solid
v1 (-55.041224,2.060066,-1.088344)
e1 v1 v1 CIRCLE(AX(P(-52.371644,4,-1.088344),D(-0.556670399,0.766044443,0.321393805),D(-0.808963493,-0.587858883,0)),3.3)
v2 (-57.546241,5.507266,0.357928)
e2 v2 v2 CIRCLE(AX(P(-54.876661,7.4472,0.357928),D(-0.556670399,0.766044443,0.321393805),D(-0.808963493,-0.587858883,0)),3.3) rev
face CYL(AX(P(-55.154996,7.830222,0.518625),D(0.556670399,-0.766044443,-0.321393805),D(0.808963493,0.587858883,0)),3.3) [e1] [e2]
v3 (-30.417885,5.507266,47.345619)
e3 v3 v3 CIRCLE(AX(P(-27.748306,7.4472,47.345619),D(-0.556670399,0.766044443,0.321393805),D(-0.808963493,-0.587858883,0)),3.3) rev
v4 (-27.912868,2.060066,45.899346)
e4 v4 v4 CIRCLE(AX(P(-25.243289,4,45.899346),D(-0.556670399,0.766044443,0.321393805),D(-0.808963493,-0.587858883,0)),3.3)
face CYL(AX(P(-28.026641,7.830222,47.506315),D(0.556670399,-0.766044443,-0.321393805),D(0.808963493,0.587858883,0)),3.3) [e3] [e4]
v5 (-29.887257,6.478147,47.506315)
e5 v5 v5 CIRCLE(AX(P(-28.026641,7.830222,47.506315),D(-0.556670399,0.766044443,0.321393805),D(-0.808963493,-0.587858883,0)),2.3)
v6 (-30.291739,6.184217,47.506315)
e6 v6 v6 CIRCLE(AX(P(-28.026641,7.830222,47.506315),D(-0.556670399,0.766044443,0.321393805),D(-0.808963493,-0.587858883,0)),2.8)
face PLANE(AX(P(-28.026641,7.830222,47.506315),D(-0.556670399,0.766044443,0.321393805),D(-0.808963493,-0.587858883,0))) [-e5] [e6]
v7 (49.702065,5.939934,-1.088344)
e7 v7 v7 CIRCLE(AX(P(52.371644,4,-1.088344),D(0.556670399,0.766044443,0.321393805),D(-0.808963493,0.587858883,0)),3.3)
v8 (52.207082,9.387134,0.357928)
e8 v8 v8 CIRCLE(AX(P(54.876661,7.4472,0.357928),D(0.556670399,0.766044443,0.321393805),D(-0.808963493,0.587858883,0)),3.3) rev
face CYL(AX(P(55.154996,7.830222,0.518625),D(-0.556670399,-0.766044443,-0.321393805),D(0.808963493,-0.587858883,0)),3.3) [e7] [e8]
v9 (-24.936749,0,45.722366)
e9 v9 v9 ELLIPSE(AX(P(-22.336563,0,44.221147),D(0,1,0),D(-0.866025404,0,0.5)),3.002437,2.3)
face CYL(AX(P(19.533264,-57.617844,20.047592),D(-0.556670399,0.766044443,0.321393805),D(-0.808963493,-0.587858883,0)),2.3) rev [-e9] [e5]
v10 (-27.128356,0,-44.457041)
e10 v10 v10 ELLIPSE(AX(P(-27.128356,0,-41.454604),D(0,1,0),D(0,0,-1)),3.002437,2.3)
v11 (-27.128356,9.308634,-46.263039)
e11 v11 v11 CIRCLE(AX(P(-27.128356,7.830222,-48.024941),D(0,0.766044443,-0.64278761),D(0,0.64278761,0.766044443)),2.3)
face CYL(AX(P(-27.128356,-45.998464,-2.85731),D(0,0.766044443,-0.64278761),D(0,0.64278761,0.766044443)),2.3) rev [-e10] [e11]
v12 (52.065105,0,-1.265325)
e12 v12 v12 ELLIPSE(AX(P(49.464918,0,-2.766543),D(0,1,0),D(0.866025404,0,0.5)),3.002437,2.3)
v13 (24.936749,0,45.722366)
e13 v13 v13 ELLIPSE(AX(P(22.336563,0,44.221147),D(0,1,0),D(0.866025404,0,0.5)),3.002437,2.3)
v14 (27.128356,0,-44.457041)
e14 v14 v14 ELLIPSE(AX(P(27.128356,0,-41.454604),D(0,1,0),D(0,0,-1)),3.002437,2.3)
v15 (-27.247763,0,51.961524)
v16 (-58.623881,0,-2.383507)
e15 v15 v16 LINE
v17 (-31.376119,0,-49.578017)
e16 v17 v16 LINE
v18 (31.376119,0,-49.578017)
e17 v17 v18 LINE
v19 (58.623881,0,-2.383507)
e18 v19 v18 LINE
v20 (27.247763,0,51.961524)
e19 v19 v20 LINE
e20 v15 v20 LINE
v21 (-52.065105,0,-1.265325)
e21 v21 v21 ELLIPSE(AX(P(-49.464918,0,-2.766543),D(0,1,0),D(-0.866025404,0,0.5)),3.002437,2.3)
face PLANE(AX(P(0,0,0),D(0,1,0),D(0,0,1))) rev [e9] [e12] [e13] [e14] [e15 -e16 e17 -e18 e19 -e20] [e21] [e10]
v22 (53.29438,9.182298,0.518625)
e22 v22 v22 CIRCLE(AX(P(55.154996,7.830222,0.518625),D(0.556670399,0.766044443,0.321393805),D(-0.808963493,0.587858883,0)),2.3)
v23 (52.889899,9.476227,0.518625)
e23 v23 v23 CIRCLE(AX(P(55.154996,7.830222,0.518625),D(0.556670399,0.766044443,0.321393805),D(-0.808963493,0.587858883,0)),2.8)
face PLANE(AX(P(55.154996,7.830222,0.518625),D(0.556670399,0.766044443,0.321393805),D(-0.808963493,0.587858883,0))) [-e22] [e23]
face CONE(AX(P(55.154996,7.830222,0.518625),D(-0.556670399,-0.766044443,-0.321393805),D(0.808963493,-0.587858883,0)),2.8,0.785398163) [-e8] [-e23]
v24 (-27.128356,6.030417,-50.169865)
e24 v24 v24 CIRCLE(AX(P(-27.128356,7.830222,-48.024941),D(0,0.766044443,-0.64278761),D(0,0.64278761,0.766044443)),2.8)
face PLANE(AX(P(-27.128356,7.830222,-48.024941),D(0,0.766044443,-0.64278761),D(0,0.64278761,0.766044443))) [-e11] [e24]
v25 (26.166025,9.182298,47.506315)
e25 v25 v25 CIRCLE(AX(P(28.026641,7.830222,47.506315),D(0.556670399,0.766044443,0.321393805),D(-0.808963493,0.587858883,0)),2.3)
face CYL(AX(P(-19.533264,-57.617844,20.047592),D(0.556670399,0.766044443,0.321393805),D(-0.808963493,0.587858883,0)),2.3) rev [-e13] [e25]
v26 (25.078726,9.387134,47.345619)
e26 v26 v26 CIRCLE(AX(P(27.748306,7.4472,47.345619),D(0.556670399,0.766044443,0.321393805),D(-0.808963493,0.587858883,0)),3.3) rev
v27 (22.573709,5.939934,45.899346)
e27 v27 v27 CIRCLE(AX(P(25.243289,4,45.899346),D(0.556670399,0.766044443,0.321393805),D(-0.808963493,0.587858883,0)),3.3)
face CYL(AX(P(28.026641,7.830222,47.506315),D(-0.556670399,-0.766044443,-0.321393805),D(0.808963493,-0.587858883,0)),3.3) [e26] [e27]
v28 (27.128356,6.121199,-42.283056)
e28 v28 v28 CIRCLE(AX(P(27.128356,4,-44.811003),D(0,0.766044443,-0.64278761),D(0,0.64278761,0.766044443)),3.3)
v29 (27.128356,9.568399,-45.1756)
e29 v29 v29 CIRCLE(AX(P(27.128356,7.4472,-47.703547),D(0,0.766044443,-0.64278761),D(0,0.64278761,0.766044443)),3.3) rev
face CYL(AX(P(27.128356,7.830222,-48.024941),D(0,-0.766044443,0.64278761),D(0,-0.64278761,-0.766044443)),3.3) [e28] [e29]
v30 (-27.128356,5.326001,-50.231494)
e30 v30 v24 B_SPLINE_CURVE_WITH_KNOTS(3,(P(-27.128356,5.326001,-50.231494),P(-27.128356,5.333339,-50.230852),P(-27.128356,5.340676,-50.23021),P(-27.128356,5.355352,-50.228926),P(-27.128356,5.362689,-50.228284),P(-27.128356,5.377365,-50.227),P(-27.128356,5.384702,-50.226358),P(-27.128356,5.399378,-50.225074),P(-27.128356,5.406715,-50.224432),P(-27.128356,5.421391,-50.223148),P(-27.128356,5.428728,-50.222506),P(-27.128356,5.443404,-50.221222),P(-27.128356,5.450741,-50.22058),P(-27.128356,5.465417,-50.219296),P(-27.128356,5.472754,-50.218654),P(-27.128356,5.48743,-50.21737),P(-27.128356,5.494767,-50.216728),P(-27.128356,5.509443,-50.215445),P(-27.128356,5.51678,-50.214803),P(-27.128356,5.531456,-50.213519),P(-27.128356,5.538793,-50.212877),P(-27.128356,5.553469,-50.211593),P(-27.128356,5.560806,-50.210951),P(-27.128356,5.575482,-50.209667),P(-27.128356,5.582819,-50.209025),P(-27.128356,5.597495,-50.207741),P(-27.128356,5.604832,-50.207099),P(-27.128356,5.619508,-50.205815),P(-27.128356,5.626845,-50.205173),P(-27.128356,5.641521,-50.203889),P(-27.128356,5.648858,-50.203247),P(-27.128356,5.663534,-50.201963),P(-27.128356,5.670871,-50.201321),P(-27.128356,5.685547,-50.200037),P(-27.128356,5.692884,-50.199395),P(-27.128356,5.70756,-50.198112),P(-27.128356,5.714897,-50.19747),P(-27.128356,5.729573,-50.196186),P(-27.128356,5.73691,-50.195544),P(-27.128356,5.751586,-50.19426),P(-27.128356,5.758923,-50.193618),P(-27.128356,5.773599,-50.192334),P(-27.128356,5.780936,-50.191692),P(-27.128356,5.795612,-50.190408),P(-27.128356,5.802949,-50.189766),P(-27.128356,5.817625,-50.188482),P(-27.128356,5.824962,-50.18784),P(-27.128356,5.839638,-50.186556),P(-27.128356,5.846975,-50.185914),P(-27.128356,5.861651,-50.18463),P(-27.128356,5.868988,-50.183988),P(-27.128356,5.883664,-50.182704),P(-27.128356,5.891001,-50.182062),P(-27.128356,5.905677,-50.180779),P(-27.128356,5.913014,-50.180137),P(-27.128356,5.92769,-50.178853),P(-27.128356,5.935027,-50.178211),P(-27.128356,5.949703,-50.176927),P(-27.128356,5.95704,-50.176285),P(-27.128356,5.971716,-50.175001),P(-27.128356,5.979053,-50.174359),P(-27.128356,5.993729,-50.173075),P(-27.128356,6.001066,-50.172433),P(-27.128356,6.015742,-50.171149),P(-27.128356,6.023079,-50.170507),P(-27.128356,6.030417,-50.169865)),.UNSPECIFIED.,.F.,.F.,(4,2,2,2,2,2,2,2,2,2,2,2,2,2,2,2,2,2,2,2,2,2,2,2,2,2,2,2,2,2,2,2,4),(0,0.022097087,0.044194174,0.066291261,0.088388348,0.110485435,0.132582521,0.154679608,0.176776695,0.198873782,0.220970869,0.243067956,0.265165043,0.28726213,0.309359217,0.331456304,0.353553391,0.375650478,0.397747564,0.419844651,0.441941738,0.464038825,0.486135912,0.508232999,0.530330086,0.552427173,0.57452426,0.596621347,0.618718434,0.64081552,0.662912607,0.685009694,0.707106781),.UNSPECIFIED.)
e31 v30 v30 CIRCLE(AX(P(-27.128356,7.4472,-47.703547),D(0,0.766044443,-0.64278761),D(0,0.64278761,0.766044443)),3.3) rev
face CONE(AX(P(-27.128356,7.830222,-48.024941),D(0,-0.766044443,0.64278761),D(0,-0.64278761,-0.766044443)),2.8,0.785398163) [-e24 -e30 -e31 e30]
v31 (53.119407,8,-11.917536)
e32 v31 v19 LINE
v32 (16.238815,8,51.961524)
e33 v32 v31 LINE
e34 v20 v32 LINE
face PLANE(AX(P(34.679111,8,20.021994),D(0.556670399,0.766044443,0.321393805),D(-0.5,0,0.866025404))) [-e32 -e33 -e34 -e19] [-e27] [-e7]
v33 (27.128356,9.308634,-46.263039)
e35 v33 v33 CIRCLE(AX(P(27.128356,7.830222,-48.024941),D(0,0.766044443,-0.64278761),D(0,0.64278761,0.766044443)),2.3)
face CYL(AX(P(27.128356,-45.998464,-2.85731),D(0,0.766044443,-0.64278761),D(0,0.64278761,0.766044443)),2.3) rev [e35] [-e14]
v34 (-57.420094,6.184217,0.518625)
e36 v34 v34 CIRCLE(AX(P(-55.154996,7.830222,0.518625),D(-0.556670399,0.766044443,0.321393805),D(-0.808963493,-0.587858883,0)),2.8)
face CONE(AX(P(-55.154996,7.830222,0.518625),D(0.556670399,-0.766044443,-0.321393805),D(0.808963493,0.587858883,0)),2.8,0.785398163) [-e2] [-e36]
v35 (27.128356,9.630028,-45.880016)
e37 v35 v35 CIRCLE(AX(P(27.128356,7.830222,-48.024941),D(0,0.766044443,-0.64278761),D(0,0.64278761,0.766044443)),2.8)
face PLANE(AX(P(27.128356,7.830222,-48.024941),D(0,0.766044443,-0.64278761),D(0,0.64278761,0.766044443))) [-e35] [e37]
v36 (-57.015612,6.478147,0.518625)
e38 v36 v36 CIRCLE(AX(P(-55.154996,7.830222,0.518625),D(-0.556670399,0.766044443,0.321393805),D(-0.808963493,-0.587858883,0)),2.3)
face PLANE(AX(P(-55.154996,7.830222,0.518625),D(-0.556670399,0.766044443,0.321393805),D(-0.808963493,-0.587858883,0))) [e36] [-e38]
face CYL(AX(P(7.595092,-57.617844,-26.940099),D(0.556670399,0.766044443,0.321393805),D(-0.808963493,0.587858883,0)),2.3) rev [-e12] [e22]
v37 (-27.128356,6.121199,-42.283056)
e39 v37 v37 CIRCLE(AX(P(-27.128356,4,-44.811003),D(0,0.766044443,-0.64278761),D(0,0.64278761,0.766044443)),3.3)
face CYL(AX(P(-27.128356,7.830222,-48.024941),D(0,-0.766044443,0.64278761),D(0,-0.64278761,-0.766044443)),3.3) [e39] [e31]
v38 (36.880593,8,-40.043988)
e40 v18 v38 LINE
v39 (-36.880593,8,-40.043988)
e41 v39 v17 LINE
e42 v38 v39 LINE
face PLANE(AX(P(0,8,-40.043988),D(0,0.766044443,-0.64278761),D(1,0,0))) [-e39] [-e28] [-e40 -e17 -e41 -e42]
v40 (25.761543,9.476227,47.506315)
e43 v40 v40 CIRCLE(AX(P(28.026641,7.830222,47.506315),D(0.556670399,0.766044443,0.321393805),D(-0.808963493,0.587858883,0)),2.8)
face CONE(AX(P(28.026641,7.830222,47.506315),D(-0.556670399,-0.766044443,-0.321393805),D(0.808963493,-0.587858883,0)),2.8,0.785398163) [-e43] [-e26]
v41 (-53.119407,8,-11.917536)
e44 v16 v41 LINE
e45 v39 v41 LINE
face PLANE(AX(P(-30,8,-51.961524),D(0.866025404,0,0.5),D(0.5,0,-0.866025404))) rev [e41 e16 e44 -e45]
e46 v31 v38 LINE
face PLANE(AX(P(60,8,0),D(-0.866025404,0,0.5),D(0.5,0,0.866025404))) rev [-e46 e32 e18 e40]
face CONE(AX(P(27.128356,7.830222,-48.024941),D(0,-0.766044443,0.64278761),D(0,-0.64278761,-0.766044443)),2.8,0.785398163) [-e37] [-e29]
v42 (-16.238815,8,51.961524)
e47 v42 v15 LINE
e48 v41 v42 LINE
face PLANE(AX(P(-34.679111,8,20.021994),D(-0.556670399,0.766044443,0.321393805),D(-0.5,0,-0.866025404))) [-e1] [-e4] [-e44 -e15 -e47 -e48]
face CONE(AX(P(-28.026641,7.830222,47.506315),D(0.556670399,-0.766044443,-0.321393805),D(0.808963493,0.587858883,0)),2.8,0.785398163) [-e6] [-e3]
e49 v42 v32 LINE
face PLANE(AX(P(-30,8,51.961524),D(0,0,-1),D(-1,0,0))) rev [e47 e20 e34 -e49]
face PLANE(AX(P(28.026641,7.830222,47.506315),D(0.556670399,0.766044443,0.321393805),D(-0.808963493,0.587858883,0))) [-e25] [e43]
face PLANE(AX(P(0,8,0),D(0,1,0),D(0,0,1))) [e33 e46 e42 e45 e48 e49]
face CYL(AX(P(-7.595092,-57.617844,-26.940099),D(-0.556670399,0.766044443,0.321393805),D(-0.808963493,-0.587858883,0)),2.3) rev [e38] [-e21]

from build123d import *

# Parameters (mm, degrees)
BOSS_EXTRUDE1_DEPTH = 8
CHAMFER1_SIZE       = 10
CHAMFER1_SIZE_2     = 11.917535926
SKETCH4_R           = 2.3
CUT_EXTRUDE1_DEPTH  = 101.029376687
SKETCH7_R           = 2.3
CUT_EXTRUDE2_DEPTH  = 97.338690096
SKETCH6_R           = 2.3
CUT_EXTRUDE3_DEPTH  = 101.029376687
BOSS_EXTRUDE2_START = 5
SKETCH8_R           = 3.3
SKETCH8_R_2         = 2.3
BOSS_EXTRUDE2_DEPTH = 5
BOSS_EXTRUDE3_START = 5
SKETCH9_R           = 3.3
SKETCH9_R_2         = 2.3
BOSS_EXTRUDE3_DEPTH = 5
BOSS_EXTRUDE4_START = 5
SKETCH10_R          = 3.3
SKETCH10_R_2        = 2.3
BOSS_EXTRUDE4_DEPTH = 5
CHAMFER2_SIZE       = 0.5


with BuildPart() as part:
    # Sketch1 → Boss-Extrude1 (new body)
    with BuildSketch(Plane(origin=(0, 0, 0), x_dir=(1, 0, 0), z_dir=(0, 1, 0))):
        Polygon((-60, 0), (-30, -51.961524227), (30, -51.961524227), (60, 0), (30, 51.961524227), (-30, 51.961524227), align=None)
    extrude(amount=BOSS_EXTRUDE1_DEPTH)

    # Chamfer1
    # the kernel refuses this chamfer: 11.917535926, 10 mm, written as the material it takes off along each edge
    with BuildSketch(Plane(origin=(60.716329832, 8, -51.961524227), x_dir=(0, -0.9993728857116146, -0.0354095369136628), z_dir=(-1, 0, 0)), Plane(origin=(-75.358164916, 8, -26.601121946), x_dir=(-0.030665558503474466, -0.9993728857116146, 0.017704768456831187), z_dir=(0.4999999999999998, 0, 0.8660254037844388)), Plane(origin=(14.641835084, 8, 78.562646173), x_dir=(0.03066555850347504, -0.9993728857116146, 0.017704768456831523), z_dir=(0.4999999999999999, 0, -0.8660254037844388))) as chamfer1_piece_1:
        Polygon((CHAMFER1_SIZE * 0.999372885712, CHAMFER1_SIZE * 0.0354095369137), (-CHAMFER1_SIZE_2 * 0.0354095369135, CHAMFER1_SIZE_2 * 0.999372885707), (0, 0), align=None)
    extrude(amount=121.432659665, mode=Mode.SUBTRACT)

    # Sketch4 → Cut-Extrude1 (cut, through all)
    with BuildSketch(Plane(origin=(17.740047471, 24.412407781, 10.242221183), x_dir=(0.8301060005968417, -0.4979011414928852, -0.2510348204397117), z_dir=(0.5566703992264165, 0.766044443118981, 0.3213938048432679))):
        with Locations(Location((41.75562393, 0.929232239, 0), (0, 0, 164.627134315))):
            Circle(SKETCH4_R)
        with Locations(Location((7.440666851, -41.097835456, 0), (0, 0, 164.627134315))):
            Circle(SKETCH4_R)
    extrude(amount=-CUT_EXTRUDE1_DEPTH, mode=Mode.SUBTRACT)

    # Sketch7 → Cut-Extrude2 (cut, through all)
    with BuildSketch(Plane(origin=(0, 24.412407781, -20.484442365), x_dir=(1, 0, 0), z_dir=(0, 0.7660444431189811, -0.6427876096865357))):
        with Locations(Location((-27.128355545, 31.756069148, 0), (0, 0, 270))):
            Circle(SKETCH7_R)
        with Locations(Location((27.128355545, 31.756069148, 0), (0, 0, 270))):
            Circle(SKETCH7_R)
    extrude(amount=-CUT_EXTRUDE2_DEPTH, mode=Mode.SUBTRACT)

    # Sketch6 → Cut-Extrude3 (cut, through all)
    with BuildSketch(Plane(origin=(-17.740047471, 24.412407781, 10.242221183), x_dir=(0.8307334510088673, 0.5133226132381532, 0.21536440772154375), z_dir=(-0.5566703992264166, 0.766044443118981, 0.3213938048432678))):
        with Locations(Location((-41.687976983, 2.551112975, 0), (0, 0, 193.145847187))):
            Circle(SKETCH6_R)
        with Locations(Location((-9.032068506, -40.777657373, 0), (0, 0, 193.145847187))):
            Circle(SKETCH6_R)
    extrude(amount=-CUT_EXTRUDE3_DEPTH, mode=Mode.SUBTRACT)

    # Sketch8 → Boss-Extrude2 (add)
    # profile 1 of 2: a face of its own
    with BuildSketch(Plane(origin=(17.740047471, 24.412407781, 10.242221183), x_dir=(0.8307334510088674, -0.5133226132381531, -0.21536440772154372), z_dir=(0.5566703992264164, 0.766044443118981, 0.32139380484326796)).offset(BOSS_EXTRUDE2_START)):
        with Locations(Location((9.032068506, -40.777657373, 0), (0, 0, 166.854152813))):
            Circle(SKETCH8_R)
        with Locations(Location((9.032068506, -40.777657373, 0), (0, 0, 166.854152813))):
            Circle(SKETCH8_R_2, mode=Mode.SUBTRACT)
    # profile 2 of 2: a face of its own
    with BuildSketch(Plane(origin=(17.740047471, 24.412407781, 10.242221183), x_dir=(0.8307334510088674, -0.5133226132381531, -0.21536440772154372), z_dir=(0.5566703992264164, 0.766044443118981, 0.32139380484326796)).offset(BOSS_EXTRUDE2_START)):
        with Locations(Location((41.687976983, 2.551112975, 0), (0, 0, 166.854152813))):
            Circle(SKETCH8_R)
        with Locations(Location((41.687976983, 2.551112975, 0), (0, 0, 166.854152813))):
            Circle(SKETCH8_R_2, mode=Mode.SUBTRACT)
    extrude(amount=-BOSS_EXTRUDE2_DEPTH)

    # Sketch9 → Boss-Extrude3 (add)
    # profile 1 of 2: a face of its own
    with BuildSketch(Plane(origin=(-17.740047471, 24.412407781, 10.242221183), x_dir=(0.8307334510088673, 0.5133226132381532, 0.21536440772154375), z_dir=(-0.5566703992264166, 0.766044443118981, 0.3213938048432678)).offset(BOSS_EXTRUDE3_START)):
        with Locations(Location((-41.687976983, 2.551112975, 0), (0, 0, 193.145847187))):
            Circle(SKETCH9_R)
        with Locations(Location((-41.687976983, 2.551112975, 0), (0, 0, 193.145847187))):
            Circle(SKETCH9_R_2, mode=Mode.SUBTRACT)
    # profile 2 of 2: a face of its own
    with BuildSketch(Plane(origin=(-17.740047471, 24.412407781, 10.242221183), x_dir=(0.8307334510088673, 0.5133226132381532, 0.21536440772154375), z_dir=(-0.5566703992264166, 0.766044443118981, 0.3213938048432678)).offset(BOSS_EXTRUDE3_START)):
        with Locations(Location((-9.032068506, -40.777657373, 0), (0, 0, 193.145847187))):
            Circle(SKETCH9_R)
        with Locations(Location((-9.032068506, -40.777657373, 0), (0, 0, 193.145847187))):
            Circle(SKETCH9_R_2, mode=Mode.SUBTRACT)
    extrude(amount=-BOSS_EXTRUDE3_DEPTH)

    # Sketch10 → Boss-Extrude4 (add)
    # profile 1 of 2: a face of its own
    with BuildSketch(Plane(origin=(0, 24.412407781, -20.484442365), x_dir=(1, 0, 0), z_dir=(0, 0.7660444431189811, -0.6427876096865357)).offset(BOSS_EXTRUDE4_START)):
        with Locations(Location((-27.128355545, 31.756069148, 0), (0, 0, 270))):
            Circle(SKETCH10_R)
        with Locations(Location((-27.128355545, 31.756069148, 0), (0, 0, 270))):
            Circle(SKETCH10_R_2, mode=Mode.SUBTRACT)
    # profile 2 of 2: a face of its own
    with BuildSketch(Plane(origin=(0, 24.412407781, -20.484442365), x_dir=(1, 0, 0), z_dir=(0, 0.7660444431189811, -0.6427876096865357)).offset(BOSS_EXTRUDE4_START)):
        with Locations(Location((27.128355545, 31.756069148, 0), (0, 0, 270))):
            Circle(SKETCH10_R)
        with Locations(Location((27.128355545, 31.756069148, 0), (0, 0, 270))):
            Circle(SKETCH10_R_2, mode=Mode.SUBTRACT)
    extrude(amount=-BOSS_EXTRUDE4_DEPTH)

    # Chamfer2
    chamfer2_edges = [part.edges().sort_by_distance(p)[0] for p in [
        (27.128355545, 5.709023104, -50.552887382),
        (30.696220434, 5.890287901, 47.506315425),
        (57.824575979, 5.890287901, 0.518625295),
        (-52.485416923, 9.77015653, 0.518625295),
        (-25.357061378, 9.77015653, 47.506315425),
        (-27.128355545, 5.709023104, -50.552887382),
    ]]
    chamfer(chamfer2_edges, length=CHAMFER2_SIZE)


solid = part.part
